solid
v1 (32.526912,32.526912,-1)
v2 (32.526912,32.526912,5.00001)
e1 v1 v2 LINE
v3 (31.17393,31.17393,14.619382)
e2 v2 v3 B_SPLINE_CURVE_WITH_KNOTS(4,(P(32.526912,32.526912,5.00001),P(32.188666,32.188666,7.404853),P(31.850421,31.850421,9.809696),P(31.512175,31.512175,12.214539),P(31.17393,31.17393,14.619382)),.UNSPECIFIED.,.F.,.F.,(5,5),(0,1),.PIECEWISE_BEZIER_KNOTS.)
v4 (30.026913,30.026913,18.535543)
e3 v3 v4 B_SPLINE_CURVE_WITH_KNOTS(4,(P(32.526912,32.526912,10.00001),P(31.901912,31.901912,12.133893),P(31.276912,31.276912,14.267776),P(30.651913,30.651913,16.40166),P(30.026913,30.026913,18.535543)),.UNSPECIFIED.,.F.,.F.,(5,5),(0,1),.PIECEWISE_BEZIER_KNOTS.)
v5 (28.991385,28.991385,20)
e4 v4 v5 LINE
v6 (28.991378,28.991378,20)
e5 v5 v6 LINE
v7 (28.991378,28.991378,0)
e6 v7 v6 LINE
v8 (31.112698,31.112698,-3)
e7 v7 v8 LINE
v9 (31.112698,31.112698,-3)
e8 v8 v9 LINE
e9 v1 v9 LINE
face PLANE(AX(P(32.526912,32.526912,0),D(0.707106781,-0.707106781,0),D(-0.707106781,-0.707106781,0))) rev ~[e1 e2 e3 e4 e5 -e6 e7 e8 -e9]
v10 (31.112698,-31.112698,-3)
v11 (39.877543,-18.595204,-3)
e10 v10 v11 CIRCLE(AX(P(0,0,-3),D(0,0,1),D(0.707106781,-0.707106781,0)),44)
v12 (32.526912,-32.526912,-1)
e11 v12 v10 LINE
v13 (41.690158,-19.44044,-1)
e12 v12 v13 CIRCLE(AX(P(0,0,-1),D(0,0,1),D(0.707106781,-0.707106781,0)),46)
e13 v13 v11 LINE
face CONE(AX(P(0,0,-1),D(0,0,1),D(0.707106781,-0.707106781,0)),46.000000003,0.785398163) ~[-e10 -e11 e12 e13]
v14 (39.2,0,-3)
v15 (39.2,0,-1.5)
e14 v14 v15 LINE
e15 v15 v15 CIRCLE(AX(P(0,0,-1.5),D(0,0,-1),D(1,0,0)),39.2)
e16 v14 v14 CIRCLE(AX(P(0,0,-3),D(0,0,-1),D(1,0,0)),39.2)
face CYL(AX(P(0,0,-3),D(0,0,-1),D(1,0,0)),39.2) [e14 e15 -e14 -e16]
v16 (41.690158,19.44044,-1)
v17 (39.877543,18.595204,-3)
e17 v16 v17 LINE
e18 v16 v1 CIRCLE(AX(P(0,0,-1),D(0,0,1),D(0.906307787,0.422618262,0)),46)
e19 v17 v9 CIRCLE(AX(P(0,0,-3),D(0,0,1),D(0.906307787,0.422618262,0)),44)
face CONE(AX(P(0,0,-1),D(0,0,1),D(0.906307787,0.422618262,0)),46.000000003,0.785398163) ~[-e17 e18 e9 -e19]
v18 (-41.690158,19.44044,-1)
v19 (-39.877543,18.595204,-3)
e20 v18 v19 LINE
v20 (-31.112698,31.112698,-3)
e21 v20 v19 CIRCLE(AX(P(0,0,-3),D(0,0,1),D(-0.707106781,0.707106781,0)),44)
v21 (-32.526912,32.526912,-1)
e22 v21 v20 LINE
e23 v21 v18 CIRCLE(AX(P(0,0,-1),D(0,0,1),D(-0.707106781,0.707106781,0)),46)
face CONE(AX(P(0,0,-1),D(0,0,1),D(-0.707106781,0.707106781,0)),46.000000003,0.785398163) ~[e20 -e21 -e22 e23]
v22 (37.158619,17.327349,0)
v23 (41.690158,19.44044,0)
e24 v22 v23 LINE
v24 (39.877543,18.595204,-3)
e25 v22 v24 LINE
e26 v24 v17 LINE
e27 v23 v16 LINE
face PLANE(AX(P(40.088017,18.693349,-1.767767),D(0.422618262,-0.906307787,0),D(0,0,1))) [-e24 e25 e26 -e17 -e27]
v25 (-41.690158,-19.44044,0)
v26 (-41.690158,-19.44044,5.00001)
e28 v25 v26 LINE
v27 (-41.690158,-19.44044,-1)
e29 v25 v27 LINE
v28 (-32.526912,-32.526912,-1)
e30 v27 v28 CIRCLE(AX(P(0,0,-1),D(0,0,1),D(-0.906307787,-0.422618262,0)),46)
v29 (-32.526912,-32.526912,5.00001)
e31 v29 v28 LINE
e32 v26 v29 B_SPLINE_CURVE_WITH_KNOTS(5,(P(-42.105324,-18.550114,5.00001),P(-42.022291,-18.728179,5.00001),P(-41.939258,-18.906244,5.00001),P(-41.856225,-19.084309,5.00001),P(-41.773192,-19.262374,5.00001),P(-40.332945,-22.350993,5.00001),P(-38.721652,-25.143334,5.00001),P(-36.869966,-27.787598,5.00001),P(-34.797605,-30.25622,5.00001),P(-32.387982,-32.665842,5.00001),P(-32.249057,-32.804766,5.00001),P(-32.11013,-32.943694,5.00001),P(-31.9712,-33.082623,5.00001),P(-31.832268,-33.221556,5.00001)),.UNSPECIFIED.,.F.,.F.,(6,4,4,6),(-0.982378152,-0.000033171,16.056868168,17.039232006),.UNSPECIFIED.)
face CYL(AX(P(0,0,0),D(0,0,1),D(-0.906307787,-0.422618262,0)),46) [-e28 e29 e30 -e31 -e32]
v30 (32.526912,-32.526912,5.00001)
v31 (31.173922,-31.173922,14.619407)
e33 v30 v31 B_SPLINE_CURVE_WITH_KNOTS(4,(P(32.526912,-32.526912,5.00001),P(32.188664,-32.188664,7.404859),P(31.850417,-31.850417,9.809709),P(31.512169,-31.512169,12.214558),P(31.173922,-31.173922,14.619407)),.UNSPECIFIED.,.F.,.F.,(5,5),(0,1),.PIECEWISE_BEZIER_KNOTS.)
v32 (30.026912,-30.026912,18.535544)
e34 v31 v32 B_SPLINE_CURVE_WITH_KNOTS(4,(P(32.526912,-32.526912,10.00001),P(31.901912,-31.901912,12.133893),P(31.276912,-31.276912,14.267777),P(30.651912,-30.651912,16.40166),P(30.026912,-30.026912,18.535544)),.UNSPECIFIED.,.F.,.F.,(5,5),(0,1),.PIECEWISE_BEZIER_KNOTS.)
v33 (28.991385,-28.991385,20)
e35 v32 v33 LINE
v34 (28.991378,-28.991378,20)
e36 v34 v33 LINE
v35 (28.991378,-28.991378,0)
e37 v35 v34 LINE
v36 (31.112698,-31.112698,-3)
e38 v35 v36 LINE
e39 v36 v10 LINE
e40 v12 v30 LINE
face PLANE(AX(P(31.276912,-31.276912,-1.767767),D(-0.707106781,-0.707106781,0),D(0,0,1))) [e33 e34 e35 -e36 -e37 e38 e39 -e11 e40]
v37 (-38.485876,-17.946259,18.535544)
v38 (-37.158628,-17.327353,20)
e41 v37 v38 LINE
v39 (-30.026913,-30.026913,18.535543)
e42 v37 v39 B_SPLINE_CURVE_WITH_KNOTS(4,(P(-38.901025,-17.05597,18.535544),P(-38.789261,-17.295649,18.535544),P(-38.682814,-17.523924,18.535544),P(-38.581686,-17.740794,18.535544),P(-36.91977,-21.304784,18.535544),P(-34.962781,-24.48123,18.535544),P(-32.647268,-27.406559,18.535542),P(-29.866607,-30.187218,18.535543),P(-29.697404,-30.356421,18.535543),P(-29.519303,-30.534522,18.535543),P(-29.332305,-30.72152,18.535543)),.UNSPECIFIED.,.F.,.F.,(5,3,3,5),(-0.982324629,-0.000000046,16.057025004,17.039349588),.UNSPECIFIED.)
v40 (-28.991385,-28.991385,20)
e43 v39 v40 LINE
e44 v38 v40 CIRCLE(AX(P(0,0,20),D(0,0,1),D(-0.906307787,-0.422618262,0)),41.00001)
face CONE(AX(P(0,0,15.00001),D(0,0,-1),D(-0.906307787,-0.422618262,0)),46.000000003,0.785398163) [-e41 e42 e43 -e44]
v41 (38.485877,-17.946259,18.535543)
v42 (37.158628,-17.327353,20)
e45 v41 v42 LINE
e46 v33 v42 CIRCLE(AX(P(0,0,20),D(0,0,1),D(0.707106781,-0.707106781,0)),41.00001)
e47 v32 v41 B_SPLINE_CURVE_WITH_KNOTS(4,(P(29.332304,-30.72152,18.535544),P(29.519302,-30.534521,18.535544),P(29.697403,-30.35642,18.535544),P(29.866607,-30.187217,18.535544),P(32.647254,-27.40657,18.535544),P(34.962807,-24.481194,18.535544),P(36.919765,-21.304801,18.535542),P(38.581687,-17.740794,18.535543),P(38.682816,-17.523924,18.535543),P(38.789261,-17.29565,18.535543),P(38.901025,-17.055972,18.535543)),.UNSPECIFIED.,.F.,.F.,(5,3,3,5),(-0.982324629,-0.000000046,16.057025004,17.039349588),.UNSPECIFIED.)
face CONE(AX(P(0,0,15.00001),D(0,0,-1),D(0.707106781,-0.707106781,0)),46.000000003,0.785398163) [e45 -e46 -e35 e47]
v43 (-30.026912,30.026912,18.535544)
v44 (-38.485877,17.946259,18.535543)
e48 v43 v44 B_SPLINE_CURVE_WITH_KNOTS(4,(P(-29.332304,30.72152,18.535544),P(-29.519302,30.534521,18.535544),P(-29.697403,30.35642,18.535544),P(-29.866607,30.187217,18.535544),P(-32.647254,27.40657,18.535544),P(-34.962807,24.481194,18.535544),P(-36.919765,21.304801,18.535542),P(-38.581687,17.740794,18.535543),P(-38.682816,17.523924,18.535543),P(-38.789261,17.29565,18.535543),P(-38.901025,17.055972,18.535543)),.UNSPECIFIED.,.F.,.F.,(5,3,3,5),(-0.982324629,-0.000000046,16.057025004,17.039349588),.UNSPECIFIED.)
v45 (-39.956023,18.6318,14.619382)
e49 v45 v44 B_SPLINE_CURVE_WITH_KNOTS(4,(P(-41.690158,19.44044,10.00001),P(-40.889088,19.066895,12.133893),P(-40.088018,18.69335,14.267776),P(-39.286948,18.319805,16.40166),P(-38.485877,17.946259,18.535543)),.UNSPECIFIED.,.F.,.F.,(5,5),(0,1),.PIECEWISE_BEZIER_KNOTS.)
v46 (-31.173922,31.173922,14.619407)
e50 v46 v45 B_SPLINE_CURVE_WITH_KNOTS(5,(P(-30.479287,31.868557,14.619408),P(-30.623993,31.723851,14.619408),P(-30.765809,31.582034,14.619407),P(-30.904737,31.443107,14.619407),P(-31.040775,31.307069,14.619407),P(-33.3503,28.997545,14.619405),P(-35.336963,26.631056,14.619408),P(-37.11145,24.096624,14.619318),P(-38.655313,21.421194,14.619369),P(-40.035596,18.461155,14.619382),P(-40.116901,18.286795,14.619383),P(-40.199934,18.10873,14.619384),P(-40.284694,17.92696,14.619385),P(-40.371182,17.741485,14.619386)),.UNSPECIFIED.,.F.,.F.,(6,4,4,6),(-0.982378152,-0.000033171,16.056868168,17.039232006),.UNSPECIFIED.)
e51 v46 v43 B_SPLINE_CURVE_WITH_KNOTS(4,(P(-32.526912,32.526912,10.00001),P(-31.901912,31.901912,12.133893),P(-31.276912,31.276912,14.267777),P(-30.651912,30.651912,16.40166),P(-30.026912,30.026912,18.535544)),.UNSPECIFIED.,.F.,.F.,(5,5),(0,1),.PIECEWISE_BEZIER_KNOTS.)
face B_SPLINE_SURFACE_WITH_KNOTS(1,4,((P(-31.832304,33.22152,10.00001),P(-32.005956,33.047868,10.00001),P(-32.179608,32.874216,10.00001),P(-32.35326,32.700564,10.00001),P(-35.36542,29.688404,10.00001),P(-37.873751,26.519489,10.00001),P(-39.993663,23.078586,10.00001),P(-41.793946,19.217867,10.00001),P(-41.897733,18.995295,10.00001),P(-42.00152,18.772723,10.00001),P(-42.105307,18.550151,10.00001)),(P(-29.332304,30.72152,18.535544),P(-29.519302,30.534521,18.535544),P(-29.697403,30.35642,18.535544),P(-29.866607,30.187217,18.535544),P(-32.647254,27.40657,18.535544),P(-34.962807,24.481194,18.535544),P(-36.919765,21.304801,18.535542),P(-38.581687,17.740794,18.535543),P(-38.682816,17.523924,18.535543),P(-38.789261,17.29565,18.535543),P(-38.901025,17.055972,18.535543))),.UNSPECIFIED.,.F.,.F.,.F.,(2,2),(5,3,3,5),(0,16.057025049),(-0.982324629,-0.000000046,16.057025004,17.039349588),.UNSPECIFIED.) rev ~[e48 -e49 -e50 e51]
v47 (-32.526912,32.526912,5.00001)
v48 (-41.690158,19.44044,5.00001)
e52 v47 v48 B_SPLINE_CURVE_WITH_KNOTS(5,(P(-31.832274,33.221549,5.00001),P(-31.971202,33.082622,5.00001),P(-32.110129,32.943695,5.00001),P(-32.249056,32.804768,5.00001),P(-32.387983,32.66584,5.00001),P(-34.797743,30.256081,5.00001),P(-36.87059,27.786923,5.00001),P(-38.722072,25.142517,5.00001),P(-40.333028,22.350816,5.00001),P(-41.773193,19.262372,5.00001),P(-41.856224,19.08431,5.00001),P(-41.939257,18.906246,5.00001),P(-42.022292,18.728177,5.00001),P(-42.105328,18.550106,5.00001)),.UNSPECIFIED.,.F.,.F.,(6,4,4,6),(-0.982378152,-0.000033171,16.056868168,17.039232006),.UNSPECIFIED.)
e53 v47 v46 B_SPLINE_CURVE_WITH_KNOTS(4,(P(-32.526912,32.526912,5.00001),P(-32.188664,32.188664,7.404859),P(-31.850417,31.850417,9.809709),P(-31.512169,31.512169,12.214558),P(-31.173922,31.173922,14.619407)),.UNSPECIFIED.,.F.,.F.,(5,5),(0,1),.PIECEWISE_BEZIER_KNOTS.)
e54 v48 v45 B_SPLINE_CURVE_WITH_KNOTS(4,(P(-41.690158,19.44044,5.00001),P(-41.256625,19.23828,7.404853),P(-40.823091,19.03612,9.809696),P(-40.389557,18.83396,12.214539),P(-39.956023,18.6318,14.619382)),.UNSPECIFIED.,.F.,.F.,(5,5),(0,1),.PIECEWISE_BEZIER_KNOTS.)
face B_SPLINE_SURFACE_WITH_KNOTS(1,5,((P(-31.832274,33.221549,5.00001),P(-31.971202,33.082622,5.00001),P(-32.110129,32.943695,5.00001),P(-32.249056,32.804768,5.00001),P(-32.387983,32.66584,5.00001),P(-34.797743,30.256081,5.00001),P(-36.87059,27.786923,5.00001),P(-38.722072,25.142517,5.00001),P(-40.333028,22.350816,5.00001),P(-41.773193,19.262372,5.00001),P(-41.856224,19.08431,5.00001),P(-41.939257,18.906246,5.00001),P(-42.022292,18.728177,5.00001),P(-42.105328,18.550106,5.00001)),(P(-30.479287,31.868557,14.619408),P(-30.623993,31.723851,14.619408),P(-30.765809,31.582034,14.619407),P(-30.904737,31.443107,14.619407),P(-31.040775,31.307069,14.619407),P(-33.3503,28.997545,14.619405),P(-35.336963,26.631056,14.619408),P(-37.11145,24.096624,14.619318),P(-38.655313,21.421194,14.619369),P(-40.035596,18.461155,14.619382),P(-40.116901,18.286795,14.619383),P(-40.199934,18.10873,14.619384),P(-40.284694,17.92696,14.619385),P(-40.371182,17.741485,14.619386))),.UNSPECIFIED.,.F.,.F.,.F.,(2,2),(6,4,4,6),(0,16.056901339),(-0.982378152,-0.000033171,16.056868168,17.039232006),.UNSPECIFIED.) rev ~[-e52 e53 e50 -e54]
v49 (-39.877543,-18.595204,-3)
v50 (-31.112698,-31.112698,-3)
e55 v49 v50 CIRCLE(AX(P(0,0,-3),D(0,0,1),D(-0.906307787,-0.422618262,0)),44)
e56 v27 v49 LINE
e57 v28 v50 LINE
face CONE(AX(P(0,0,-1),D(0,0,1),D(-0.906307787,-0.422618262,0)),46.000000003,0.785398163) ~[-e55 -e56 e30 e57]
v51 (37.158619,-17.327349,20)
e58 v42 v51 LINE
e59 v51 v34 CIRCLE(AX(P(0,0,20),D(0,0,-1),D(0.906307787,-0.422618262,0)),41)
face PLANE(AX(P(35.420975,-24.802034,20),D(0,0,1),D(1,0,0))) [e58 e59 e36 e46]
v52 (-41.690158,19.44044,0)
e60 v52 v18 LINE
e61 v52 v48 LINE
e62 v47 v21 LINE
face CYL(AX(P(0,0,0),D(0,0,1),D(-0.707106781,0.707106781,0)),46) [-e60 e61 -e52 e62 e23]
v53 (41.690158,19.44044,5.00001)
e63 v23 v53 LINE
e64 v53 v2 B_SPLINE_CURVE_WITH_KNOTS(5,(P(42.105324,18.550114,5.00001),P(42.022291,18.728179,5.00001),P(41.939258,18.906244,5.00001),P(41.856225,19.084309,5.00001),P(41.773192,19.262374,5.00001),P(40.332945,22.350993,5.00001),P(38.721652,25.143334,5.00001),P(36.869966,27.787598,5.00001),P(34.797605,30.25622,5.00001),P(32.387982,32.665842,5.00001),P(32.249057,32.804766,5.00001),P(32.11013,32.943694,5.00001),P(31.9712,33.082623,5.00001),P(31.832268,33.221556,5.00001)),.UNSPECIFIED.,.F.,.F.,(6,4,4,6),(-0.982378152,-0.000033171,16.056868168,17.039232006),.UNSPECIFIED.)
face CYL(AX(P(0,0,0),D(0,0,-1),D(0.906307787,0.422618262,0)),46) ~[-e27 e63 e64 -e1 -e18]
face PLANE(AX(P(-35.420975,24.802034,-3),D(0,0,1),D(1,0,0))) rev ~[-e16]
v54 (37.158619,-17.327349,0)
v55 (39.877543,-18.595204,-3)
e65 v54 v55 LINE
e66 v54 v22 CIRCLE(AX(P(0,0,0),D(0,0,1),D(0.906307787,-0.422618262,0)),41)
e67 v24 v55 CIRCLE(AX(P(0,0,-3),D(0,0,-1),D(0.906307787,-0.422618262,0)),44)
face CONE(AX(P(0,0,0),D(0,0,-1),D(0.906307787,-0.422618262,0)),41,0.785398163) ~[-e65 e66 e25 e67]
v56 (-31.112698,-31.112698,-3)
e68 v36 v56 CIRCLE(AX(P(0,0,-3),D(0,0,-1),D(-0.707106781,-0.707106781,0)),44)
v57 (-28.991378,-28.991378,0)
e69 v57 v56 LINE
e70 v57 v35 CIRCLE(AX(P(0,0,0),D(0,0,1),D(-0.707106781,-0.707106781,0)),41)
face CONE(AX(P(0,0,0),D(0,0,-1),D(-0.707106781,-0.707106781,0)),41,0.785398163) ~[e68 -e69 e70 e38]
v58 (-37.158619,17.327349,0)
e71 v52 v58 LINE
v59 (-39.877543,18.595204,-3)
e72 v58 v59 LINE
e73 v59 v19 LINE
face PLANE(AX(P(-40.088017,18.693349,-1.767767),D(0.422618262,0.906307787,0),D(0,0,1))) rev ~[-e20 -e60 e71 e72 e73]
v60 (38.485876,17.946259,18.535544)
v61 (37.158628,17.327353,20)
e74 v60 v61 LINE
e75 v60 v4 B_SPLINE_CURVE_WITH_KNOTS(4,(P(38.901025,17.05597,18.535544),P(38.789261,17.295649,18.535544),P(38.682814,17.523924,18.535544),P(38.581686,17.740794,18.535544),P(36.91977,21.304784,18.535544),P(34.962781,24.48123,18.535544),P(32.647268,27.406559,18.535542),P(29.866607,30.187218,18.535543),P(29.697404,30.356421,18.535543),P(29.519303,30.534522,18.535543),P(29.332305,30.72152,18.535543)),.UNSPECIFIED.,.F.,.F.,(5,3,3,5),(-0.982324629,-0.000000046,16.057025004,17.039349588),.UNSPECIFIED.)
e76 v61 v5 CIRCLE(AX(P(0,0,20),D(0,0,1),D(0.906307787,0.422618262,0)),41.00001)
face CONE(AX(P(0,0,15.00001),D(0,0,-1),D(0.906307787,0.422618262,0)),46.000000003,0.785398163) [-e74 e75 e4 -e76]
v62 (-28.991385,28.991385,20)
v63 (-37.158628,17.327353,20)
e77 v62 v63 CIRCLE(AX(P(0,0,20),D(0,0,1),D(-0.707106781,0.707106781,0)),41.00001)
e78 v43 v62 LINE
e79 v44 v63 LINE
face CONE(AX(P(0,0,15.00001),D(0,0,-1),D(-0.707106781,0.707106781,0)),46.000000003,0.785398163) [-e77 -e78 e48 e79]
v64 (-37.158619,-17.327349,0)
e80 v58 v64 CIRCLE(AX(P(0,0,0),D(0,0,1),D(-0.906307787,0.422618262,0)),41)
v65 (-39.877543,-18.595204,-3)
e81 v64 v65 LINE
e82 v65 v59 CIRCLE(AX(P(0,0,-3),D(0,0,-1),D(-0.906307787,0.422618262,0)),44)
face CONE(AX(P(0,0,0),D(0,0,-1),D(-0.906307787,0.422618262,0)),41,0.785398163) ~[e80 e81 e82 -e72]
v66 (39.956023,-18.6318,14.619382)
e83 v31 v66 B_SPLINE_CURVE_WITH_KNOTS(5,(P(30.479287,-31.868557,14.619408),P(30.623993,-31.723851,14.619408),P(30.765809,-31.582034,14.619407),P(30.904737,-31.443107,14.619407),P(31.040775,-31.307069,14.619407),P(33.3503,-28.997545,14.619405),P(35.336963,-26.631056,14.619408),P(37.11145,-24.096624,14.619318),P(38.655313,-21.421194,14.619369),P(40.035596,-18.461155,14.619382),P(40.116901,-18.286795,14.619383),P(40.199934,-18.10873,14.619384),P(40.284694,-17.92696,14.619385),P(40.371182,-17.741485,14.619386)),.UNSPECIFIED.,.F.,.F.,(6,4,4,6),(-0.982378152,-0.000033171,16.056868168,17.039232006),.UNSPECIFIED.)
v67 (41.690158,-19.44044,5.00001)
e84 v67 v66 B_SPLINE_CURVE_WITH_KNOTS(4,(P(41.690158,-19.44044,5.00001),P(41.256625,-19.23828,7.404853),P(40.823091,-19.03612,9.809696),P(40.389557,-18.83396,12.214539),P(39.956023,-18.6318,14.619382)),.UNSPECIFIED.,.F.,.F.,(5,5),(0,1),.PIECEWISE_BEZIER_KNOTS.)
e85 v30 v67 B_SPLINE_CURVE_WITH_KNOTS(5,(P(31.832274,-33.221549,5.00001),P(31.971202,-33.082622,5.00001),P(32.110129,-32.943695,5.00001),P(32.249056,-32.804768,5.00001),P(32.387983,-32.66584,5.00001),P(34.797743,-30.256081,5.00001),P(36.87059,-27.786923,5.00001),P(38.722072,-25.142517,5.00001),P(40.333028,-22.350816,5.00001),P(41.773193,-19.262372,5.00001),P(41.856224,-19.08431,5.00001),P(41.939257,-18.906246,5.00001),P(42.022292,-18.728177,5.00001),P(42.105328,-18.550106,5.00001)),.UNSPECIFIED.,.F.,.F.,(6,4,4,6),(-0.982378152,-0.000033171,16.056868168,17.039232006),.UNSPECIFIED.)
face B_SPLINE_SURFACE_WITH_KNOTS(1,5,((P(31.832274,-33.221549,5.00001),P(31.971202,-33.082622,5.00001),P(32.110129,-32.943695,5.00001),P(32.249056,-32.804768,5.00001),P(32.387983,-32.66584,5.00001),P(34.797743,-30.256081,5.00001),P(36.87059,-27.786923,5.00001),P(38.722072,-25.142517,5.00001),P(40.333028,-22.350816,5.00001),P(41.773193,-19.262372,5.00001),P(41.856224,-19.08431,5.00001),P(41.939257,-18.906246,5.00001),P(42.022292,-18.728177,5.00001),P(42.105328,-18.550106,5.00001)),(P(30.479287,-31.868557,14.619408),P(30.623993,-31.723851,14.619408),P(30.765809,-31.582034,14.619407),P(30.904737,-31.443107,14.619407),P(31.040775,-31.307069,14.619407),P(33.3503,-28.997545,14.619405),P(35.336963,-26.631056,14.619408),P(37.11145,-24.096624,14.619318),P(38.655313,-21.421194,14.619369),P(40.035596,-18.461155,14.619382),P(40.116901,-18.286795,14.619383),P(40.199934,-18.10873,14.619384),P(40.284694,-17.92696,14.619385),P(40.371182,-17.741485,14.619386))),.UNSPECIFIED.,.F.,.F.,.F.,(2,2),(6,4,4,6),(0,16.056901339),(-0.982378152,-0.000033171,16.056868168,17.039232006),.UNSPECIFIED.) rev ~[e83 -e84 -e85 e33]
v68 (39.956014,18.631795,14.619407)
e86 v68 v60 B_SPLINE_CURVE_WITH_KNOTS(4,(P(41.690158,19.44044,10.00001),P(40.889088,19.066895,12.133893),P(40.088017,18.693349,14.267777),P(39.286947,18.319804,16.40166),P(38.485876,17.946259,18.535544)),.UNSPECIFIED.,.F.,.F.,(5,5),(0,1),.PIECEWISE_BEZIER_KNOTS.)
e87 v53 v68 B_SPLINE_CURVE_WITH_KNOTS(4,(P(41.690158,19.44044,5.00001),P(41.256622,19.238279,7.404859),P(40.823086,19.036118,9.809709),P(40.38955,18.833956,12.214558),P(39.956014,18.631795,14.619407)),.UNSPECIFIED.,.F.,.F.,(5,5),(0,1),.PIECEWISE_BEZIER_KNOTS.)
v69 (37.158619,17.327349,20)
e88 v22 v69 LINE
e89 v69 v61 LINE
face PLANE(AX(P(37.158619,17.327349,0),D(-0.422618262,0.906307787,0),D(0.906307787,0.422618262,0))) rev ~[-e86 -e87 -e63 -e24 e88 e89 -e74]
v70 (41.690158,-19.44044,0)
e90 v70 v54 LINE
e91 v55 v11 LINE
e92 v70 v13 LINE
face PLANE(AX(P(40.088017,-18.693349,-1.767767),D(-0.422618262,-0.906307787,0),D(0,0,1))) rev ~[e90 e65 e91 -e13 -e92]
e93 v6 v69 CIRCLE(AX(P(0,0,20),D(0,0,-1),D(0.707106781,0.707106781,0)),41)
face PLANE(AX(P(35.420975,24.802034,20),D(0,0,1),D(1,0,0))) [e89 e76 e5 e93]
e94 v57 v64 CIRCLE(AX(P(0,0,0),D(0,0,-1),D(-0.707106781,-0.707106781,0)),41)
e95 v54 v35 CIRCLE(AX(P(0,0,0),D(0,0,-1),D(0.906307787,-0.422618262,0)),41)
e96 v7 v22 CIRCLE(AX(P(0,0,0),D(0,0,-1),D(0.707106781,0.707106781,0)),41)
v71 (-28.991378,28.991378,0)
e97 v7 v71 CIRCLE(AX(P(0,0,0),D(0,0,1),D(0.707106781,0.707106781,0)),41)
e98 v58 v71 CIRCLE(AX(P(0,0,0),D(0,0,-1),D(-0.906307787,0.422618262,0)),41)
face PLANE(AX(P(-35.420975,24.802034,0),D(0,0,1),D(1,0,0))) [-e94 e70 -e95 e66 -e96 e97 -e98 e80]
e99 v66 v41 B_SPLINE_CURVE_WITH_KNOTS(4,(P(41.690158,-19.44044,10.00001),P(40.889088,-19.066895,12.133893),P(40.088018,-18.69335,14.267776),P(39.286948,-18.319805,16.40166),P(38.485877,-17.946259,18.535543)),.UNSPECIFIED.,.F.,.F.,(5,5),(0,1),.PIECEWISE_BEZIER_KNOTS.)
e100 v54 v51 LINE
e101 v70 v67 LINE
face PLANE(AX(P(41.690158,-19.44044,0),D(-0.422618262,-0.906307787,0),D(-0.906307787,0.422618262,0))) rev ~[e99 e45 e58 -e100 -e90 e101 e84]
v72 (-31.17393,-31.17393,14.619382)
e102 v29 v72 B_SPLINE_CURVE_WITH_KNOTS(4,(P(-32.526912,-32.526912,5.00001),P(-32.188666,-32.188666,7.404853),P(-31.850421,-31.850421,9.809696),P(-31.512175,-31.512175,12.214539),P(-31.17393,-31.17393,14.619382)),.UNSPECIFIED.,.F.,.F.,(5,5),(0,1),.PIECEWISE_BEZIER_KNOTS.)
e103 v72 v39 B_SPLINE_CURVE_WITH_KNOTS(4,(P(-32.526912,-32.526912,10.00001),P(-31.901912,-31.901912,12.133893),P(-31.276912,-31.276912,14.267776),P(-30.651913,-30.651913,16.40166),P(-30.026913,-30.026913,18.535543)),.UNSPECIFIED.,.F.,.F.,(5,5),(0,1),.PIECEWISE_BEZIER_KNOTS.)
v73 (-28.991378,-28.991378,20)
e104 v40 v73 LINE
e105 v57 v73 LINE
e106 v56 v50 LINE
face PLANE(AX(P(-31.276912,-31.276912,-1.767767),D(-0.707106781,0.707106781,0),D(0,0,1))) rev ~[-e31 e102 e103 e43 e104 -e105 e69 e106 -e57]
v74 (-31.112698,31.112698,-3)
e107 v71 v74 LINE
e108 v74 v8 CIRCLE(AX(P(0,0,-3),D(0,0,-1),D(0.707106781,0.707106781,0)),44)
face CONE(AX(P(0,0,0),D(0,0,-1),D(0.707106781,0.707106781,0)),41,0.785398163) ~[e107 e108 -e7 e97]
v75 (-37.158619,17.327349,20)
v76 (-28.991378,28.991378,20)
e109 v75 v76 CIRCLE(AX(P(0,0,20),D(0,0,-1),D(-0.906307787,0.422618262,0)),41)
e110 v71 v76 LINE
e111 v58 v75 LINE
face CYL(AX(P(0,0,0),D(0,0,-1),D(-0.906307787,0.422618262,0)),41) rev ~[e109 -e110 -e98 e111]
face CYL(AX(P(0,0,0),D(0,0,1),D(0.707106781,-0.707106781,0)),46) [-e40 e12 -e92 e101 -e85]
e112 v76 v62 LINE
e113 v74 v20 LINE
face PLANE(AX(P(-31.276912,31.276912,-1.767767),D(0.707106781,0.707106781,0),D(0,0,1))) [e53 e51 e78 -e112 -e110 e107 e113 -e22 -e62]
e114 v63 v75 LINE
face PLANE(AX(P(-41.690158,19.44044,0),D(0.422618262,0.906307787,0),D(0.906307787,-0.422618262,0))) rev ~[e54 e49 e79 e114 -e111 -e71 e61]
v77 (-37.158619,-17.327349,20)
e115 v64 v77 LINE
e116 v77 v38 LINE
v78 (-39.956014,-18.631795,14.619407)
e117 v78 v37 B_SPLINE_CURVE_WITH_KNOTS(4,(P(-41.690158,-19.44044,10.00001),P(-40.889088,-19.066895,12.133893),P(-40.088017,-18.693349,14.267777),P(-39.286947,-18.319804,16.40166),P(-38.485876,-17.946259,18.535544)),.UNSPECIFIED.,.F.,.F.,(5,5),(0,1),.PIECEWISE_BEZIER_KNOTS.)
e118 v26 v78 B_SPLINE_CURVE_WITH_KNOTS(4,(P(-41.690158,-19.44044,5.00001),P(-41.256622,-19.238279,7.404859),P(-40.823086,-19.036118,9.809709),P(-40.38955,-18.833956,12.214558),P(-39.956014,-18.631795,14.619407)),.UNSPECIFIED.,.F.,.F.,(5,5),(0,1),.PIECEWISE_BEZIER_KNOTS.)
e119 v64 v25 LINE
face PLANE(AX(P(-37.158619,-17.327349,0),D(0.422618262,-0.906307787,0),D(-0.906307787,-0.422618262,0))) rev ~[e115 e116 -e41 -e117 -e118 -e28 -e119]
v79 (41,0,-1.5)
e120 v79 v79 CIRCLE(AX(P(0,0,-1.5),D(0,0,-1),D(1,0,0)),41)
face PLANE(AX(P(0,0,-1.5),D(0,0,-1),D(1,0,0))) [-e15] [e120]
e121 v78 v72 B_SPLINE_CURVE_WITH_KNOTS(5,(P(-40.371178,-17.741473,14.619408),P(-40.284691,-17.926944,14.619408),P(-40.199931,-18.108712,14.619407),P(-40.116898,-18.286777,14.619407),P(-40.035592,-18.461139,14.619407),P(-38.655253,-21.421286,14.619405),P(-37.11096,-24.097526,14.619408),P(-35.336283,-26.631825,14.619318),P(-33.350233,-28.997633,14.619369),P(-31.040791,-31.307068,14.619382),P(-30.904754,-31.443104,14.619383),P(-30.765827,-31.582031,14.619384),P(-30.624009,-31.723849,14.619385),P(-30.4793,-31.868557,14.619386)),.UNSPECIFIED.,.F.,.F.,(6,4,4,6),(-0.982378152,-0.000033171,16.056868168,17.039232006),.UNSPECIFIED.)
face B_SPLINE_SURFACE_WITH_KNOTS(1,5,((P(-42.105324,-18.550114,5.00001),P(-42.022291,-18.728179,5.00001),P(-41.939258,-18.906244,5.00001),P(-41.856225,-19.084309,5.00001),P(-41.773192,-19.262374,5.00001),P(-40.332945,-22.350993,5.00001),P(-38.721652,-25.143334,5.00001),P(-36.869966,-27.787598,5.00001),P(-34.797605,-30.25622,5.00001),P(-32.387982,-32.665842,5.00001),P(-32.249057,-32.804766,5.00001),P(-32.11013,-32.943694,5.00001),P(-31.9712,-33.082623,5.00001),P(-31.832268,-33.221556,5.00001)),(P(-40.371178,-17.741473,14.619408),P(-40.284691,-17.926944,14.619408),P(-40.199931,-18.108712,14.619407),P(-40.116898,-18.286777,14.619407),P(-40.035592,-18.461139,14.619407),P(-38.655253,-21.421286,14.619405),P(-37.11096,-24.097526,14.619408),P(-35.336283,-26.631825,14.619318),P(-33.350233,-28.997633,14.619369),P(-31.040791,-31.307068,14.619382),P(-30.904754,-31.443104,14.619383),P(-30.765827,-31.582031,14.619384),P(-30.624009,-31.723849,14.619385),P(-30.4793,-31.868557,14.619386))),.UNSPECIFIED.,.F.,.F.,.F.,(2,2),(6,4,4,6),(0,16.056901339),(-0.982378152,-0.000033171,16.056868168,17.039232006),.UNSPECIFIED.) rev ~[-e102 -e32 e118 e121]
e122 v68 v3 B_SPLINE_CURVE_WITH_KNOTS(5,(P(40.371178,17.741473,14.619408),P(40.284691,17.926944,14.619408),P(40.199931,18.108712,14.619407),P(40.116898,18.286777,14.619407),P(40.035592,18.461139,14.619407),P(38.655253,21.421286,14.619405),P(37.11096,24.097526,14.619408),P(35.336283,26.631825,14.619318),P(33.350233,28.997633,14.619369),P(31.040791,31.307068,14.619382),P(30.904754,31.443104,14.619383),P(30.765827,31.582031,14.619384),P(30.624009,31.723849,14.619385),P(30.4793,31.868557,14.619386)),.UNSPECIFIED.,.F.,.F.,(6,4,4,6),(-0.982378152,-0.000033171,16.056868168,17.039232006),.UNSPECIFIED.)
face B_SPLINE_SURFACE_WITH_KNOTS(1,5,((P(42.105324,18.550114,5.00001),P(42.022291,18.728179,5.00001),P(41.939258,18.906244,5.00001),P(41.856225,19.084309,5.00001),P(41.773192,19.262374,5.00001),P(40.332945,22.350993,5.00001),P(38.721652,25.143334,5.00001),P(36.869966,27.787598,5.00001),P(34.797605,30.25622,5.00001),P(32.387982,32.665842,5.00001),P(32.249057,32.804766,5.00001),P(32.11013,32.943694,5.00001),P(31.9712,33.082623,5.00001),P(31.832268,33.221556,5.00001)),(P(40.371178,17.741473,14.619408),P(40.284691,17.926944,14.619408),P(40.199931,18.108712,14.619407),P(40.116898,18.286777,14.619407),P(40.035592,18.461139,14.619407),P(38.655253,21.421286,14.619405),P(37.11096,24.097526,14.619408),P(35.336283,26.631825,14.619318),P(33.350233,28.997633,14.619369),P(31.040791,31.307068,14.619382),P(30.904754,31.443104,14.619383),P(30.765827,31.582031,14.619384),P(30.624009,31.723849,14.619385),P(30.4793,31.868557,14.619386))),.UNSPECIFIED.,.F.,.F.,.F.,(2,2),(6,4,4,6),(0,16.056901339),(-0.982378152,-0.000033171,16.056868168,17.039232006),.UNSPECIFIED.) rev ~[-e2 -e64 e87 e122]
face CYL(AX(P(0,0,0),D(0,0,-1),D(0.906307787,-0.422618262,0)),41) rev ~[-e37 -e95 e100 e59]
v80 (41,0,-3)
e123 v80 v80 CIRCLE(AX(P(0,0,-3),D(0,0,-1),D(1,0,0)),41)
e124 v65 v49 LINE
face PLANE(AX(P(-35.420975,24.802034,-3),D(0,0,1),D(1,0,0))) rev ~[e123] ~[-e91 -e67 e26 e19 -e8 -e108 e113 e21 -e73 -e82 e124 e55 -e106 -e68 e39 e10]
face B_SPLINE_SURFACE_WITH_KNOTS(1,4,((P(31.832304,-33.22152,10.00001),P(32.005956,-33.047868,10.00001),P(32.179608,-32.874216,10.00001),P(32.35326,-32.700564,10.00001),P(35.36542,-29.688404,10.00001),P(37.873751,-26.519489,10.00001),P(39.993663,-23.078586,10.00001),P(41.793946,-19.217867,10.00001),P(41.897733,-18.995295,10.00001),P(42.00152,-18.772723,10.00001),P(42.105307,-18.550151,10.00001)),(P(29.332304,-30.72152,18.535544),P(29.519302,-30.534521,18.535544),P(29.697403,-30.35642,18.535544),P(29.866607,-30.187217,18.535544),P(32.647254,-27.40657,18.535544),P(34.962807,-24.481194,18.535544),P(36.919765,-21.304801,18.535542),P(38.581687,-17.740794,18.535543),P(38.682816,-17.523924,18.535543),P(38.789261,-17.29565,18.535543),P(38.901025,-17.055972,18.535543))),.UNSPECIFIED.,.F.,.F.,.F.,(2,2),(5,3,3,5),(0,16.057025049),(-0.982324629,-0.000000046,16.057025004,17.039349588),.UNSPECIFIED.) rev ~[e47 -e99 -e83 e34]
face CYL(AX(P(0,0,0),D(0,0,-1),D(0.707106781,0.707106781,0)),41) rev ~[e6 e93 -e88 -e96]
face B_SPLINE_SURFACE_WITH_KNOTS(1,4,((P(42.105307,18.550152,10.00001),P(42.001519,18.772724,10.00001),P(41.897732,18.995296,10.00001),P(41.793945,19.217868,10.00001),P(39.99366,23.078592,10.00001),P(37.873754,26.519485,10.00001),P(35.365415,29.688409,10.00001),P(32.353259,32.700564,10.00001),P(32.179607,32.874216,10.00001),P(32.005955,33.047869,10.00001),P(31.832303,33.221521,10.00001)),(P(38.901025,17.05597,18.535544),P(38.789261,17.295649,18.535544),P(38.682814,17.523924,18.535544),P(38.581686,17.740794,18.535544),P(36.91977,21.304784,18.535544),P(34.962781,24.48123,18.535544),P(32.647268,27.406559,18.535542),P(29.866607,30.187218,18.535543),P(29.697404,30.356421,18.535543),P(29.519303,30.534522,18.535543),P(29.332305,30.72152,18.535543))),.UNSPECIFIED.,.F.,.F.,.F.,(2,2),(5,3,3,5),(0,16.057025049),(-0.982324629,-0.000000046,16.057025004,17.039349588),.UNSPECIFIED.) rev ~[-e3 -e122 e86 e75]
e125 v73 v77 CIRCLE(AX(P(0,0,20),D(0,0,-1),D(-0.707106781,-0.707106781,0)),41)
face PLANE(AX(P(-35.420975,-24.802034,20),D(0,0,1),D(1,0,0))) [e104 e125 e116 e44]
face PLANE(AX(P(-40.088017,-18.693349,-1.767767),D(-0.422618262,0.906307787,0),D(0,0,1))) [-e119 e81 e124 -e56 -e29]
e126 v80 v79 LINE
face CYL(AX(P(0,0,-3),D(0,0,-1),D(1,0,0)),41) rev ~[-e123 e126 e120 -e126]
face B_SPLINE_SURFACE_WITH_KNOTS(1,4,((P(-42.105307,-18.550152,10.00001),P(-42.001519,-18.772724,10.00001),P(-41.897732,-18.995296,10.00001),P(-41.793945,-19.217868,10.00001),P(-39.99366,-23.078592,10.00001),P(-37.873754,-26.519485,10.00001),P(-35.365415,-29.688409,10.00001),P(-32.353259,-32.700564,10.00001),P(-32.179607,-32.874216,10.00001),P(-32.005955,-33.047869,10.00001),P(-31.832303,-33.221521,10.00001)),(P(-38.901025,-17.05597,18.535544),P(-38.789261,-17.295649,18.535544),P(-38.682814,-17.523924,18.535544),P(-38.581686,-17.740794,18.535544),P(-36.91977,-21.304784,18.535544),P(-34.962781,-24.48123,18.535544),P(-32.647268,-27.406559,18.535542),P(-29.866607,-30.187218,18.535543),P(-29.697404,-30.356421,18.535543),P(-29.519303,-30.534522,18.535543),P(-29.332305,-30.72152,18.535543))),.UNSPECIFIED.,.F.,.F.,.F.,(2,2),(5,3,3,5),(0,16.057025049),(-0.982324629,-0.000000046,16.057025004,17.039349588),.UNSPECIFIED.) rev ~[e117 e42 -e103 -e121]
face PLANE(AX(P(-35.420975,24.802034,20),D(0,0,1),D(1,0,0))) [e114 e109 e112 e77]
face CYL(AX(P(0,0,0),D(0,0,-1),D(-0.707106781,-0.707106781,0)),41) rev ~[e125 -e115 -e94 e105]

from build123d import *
from build123d import SkipClean  # not in build123d's __all__

# Parameters (mm, degrees)
F1_DEPTH    = 20
F2_SIZE     = 4.99999
F2_2_SIZE   = 4.99999
F2_3_SIZE   = 4.99999
F2_4_SIZE   = 4.99999
F3_DEPTH    = 3
F4_SIZE     = 5
F5_R        = 41
F5_R_2      = 39.2
F6_DEPTH    = 1.5
F7_SIZE     = 5
F8_T2_ANGLE = 50
F8_T4_ANGLE = 90
F8_T6_ANGLE = 50
F8_T8_ANGLE = 90
F9_SIZE     = 2


# Not quite as in the source:
# - a fillet or chamfer that OpenCascade refuses, or shapes differently, is made with other operations: its cross-section is extruded or revolved along the edge and cut away or added
# - a fillet or chamfer is up to 0.001 mm smaller than in the source, because OpenCascade refuses the exact size


with BuildPart() as f1:
    # F0 (on Top) → F1 (new body)
    with BuildSketch(Plane.XY):
        with BuildLine():
            ThreePointArc((-37.1586192685, 17.3273487314), (-33.5852338158, 23.5166338904), (-28.9913780286, 28.9913780286))
            Line((-28.9913780286, 28.9913780286), (-32.5269119346, 32.5269119346))
            ThreePointArc((-32.5269119346, 32.5269119346), (-37.6809940373, 26.3845160721), (-41.6901582037, 19.4404400401))
            Line((-41.6901582037, 19.4404400401), (-37.1586192685, 17.3273487314))
        make_face()
    extrude(amount=F1_DEPTH)

    # F2 (size 5 in the source; OpenCascade refuses exactly that, so slightly less here)
    f2_edges = [f1.edges().sort_by_distance(p)[0] for p in [
        (-37.680994, 26.384516, 20),
    ]]
    chamfer(f2_edges, length=F2_SIZE)



with BuildPart() as f1b:
    # F0 (on Top) → F1, piece 2 (new body)
    with BuildSketch(Plane.XY):
        with BuildLine():
            ThreePointArc((28.9913780286, 28.9913780286), (33.5852338158, 23.5166338904), (37.1586192685, 17.3273487314))
            Line((37.1586192685, 17.3273487314), (41.6901582037, 19.4404400401))
            ThreePointArc((41.6901582037, 19.4404400401), (37.6809940373, 26.3845160721), (32.5269119346, 32.5269119346))
            Line((32.5269119346, 32.5269119346), (28.9913780286, 28.9913780286))
        make_face()
    extrude(amount=F1_DEPTH)

    # F2#2 (size 5 in the source; OpenCascade refuses exactly that, so slightly less here)
    f2_2_edges = [f1b.edges().sort_by_distance(p)[0] for p in [
        (37.680994, 26.384516, 20),
    ]]
    chamfer(f2_2_edges, length=F2_2_SIZE)


with BuildPart() as f1c:
    # F0 (on Top) → F1, piece 3 (new body)
    with BuildSketch(Plane.XY):
        with BuildLine():
            Line((-32.5269119346, -32.5269119346), (-28.9913780286, -28.9913780286))
            ThreePointArc((-28.9913780286, -28.9913780286), (-33.5852338158, -23.5166338904), (-37.1586192685, -17.3273487314))
            Line((-37.1586192685, -17.3273487314), (-41.6901582037, -19.4404400401))
            ThreePointArc((-41.6901582037, -19.4404400401), (-37.6809940373, -26.3845160721), (-32.5269119346, -32.5269119346))
        make_face()
    extrude(amount=F1_DEPTH)

    # F2#3 (size 5 in the source; OpenCascade refuses exactly that, so slightly less here)
    f2_3_edges = [f1c.edges().sort_by_distance(p)[0] for p in [
        (-37.680994, -26.384516, 20),
    ]]
    chamfer(f2_3_edges, length=F2_3_SIZE)


with BuildPart() as f1d:
    # F0 (on Top) → F1, piece 4 (new body)
    with BuildSketch(Plane.XY):
        with BuildLine():
            Line((41.6901582037, -19.4404400401), (37.1586192685, -17.3273487314))
            ThreePointArc((37.1586192685, -17.3273487314), (33.5852338158, -23.5166338904), (28.9913780286, -28.9913780286))
            Line((28.9913780286, -28.9913780286), (32.5269119346, -32.5269119346))
            ThreePointArc((32.5269119346, -32.5269119346), (37.6809940373, -26.3845160721), (41.6901582037, -19.4404400401))
        make_face()
    extrude(amount=F1_DEPTH)

    # F2#4 (size 5 in the source; OpenCascade refuses exactly that, so slightly less here)
    f2_4_edges = [f1d.edges().sort_by_distance(p)[0] for p in [
        (37.680994, -26.384516, 20),
    ]]
    chamfer(f2_4_edges, length=F2_4_SIZE)


with BuildPart() as f1_1:
    add(f1.part, clean=False)

    with SkipClean():  # cleaning this boolean's faces spoils the solid; the shape is the same uncleaned
        add(f1b.part)  # F3 merges F1b

    with SkipClean():  # cleaning this boolean's faces spoils the solid; the shape is the same uncleaned
        add(f1c.part)  # F3 merges F1c

    with SkipClean():  # cleaning this boolean's faces spoils the solid; the shape is the same uncleaned
        add(f1d.part)  # F3 merges F1d
    # F0 (on Top) → F3 (join)
    with BuildSketch(Plane.XY):
        with BuildLine():
            ThreePointArc((-37.1586192685, 17.3273487314), (-33.5852338158, 23.5166338904), (-28.9913780286, 28.9913780286))
            Line((-28.9913780286, 28.9913780286), (-32.5269119346, 32.5269119346))
            ThreePointArc((-32.5269119346, 32.5269119346), (-37.6809940373, 26.3845160721), (-41.6901582037, 19.4404400401))
            Line((-41.6901582037, 19.4404400401), (-37.1586192685, 17.3273487314))
        make_face()
        with BuildLine():
            Line((32.5269119346, -32.5269119346), (28.9913780286, -28.9913780286))
            ThreePointArc((28.9913780286, -28.9913780286), (0, -41), (-28.9913780286, -28.9913780286))
            Line((-28.9913780286, -28.9913780286), (-32.5269119346, -32.5269119346))
            ThreePointArc((-32.5269119346, -32.5269119346), (0, -46), (32.5269119346, -32.5269119346))
        make_face()
        with BuildLine():
            ThreePointArc((28.9913780286, 28.9913780286), (33.5852338158, 23.5166338904), (37.1586192685, 17.3273487314))
            Line((37.1586192685, 17.3273487314), (41.6901582037, 19.4404400401))
            ThreePointArc((41.6901582037, 19.4404400401), (37.6809940373, 26.3845160721), (32.5269119346, 32.5269119346))
            Line((32.5269119346, 32.5269119346), (28.9913780286, 28.9913780286))
        make_face()
        with BuildLine():
            ThreePointArc((-28.9913780286, 28.9913780286), (0, 41), (28.9913780286, 28.9913780286))
            Line((28.9913780286, 28.9913780286), (32.5269119346, 32.5269119346))
            ThreePointArc((32.5269119346, 32.5269119346), (0, 46), (-32.5269119346, 32.5269119346))
            Line((-32.5269119346, 32.5269119346), (-28.9913780286, 28.9913780286))
        make_face()
        with BuildLine():
            ThreePointArc((37.1586192685, -17.3273487314), (40.0281362919, -8.8740241715), (41, 0))
            ThreePointArc((41, 0), (40.0281362919, 8.8740241715), (37.1586192685, 17.3273487314))
            ThreePointArc((37.1586192685, 17.3273487314), (33.5852338158, 23.5166338904), (28.9913780286, 28.9913780286))
            ThreePointArc((28.9913780286, 28.9913780286), (0, 41), (-28.9913780286, 28.9913780286))
            ThreePointArc((-28.9913780286, 28.9913780286), (-33.5852338158, 23.5166338904), (-37.1586192685, 17.3273487314))
            ThreePointArc((-37.1586192685, 17.3273487314), (-41, 0), (-37.1586192685, -17.3273487314))
            ThreePointArc((-37.1586192685, -17.3273487314), (-33.5852338158, -23.5166338904), (-28.9913780286, -28.9913780286))
            ThreePointArc((-28.9913780286, -28.9913780286), (0, -41), (28.9913780286, -28.9913780286))
            ThreePointArc((28.9913780286, -28.9913780286), (33.5852338158, -23.5166338904), (37.1586192685, -17.3273487314))
        make_face()
        with BuildLine():
            Line((-32.5269119346, -32.5269119346), (-28.9913780286, -28.9913780286))
            ThreePointArc((-28.9913780286, -28.9913780286), (-33.5852338158, -23.5166338904), (-37.1586192685, -17.3273487314))
            Line((-37.1586192685, -17.3273487314), (-41.6901582037, -19.4404400401))
            ThreePointArc((-41.6901582037, -19.4404400401), (-37.6809940373, -26.3845160721), (-32.5269119346, -32.5269119346))
        make_face()
        with BuildLine():
            Line((41.6901582037, -19.4404400401), (37.1586192685, -17.3273487314))
            ThreePointArc((37.1586192685, -17.3273487314), (33.5852338158, -23.5166338904), (28.9913780286, -28.9913780286))
            Line((28.9913780286, -28.9913780286), (32.5269119346, -32.5269119346))
            ThreePointArc((32.5269119346, -32.5269119346), (37.6809940373, -26.3845160721), (41.6901582037, -19.4404400401))
        make_face()
        with BuildLine():
            ThreePointArc((37.1586192685, 17.3273487314), (40.0281362919, 8.8740241715), (41, 0))
            ThreePointArc((41, 0), (40.0281362919, -8.8740241715), (37.1586192685, -17.3273487314))
            Line((37.1586192685, -17.3273487314), (41.6901582037, -19.4404400401))
            ThreePointArc((41.6901582037, -19.4404400401), (44.9096163275, -9.9562222412), (46, 0))
            ThreePointArc((46, 0), (44.9096163275, 9.9562222412), (41.6901582037, 19.4404400401))
            Line((41.6901582037, 19.4404400401), (37.1586192685, 17.3273487314))
        make_face()
        with BuildLine():
            ThreePointArc((-37.1586192685, -17.3273487314), (-41, 0), (-37.1586192685, 17.3273487314))
            Line((-37.1586192685, 17.3273487314), (-41.6901582037, 19.4404400401))
            ThreePointArc((-41.6901582037, 19.4404400401), (-46, 0), (-41.6901582037, -19.4404400401))
            Line((-41.6901582037, -19.4404400401), (-37.1586192685, -17.3273487314))
        make_face()
    with SkipClean():  # cleaning this boolean's faces spoils the solid; the shape is the same uncleaned
        extrude(amount=-F3_DEPTH)

    # F4
    f4_edges = [f1_1.edges().sort_by_distance(p)[0] for p in [
        (-37.680994, -26.384516, 15.00001),
        (-37.680994, 26.384516, 15.00001),
        (37.680994, -26.384516, 15.00001),
        (37.680994, 26.384516, 15.00001),
    ]]
    chamfer(f4_edges, length=F4_SIZE)

    # F5 (on face) → F6 (cut)
    with BuildSketch(Plane(origin=(0, 0, -3), x_dir=(1, 0, 0), z_dir=(0, 0, -1))):
        Circle(F5_R)
        Circle(F5_R_2, mode=Mode.SUBTRACT)
    with SkipClean():  # cleaning this boolean's faces spoils the solid; the shape is the same uncleaned
        extrude(amount=-F6_DEPTH, mode=Mode.SUBTRACT)

    # F7
    f7_edges = [f1_1.edges().sort_by_distance(p)[0] for p in [
        (-37.680994, -26.384516, 10.00001),
        (37.680994, -26.384516, 10.00001),
        (37.680994, 26.384516, 10.00001),
        (-37.680994, 26.384516, 10.00001),
    ]]
    chamfer(f7_edges, length=F7_SIZE)

    # F8: chamfer of 5 on 4 edges, made by hand

    # F8_s1 → F8_t2 (revolve, cut)
    with BuildSketch(Plane(origin=(0, 0, 0), x_dir=(0, 0, 1), z_dir=(0.4226182617, 0.906307787, 0))):
        Polygon((0, -41), (-5, -46), (0, -46), align=None)
    revolve(axis=Axis((0, 0, 0), (0, 0, 1)), revolution_arc=F8_T2_ANGLE, mode=Mode.SUBTRACT)

    # F8_s3 → F8_t4 (revolve, cut)
    with BuildSketch(Plane(origin=(0, 0, 0), x_dir=(0, 0, 1), z_dir=(0.7071067812, -0.7071067812, 0))):
        Polygon((0, -41), (-5, -46), (0, -46), align=None)
    revolve(axis=Axis((0, 0, 0), (0, 0, 1)), revolution_arc=F8_T4_ANGLE, mode=Mode.SUBTRACT)

    # F8_s5 → F8_t6 (revolve, cut)
    with BuildSketch(Plane(origin=(0, 0, 0), x_dir=(0, 0, 1), z_dir=(-0.4226182617, -0.906307787, 0))):
        Polygon((0, -41), (-5, -46), (0, -46), align=None)
    revolve(axis=Axis((0, 0, 0), (0, 0, 1)), revolution_arc=F8_T6_ANGLE, mode=Mode.SUBTRACT)

    # F8_s7 → F8_t8 (revolve, cut)
    with BuildSketch(Plane(origin=(0, 0, 0), x_dir=(0, 0, 1), z_dir=(-0.7071067812, 0.7071067812, 0))):
        Polygon((0, -41), (-5, -46), (0, -46), align=None)
    revolve(axis=Axis((0, 0, 0), (0, 0, 1)), revolution_arc=F8_T8_ANGLE, mode=Mode.SUBTRACT)

    # F9
    f9_edges = [f1_1.edges().sort_by_distance(p)[0] for p in [
        (-37.680994, -26.384516, -3),
        (37.680994, -26.384516, -3),
        (37.680994, 26.384516, -3),
        (-37.680994, 26.384516, -3),
    ]]
    chamfer(f9_edges, length=F9_SIZE)


solid = f1_1.part
